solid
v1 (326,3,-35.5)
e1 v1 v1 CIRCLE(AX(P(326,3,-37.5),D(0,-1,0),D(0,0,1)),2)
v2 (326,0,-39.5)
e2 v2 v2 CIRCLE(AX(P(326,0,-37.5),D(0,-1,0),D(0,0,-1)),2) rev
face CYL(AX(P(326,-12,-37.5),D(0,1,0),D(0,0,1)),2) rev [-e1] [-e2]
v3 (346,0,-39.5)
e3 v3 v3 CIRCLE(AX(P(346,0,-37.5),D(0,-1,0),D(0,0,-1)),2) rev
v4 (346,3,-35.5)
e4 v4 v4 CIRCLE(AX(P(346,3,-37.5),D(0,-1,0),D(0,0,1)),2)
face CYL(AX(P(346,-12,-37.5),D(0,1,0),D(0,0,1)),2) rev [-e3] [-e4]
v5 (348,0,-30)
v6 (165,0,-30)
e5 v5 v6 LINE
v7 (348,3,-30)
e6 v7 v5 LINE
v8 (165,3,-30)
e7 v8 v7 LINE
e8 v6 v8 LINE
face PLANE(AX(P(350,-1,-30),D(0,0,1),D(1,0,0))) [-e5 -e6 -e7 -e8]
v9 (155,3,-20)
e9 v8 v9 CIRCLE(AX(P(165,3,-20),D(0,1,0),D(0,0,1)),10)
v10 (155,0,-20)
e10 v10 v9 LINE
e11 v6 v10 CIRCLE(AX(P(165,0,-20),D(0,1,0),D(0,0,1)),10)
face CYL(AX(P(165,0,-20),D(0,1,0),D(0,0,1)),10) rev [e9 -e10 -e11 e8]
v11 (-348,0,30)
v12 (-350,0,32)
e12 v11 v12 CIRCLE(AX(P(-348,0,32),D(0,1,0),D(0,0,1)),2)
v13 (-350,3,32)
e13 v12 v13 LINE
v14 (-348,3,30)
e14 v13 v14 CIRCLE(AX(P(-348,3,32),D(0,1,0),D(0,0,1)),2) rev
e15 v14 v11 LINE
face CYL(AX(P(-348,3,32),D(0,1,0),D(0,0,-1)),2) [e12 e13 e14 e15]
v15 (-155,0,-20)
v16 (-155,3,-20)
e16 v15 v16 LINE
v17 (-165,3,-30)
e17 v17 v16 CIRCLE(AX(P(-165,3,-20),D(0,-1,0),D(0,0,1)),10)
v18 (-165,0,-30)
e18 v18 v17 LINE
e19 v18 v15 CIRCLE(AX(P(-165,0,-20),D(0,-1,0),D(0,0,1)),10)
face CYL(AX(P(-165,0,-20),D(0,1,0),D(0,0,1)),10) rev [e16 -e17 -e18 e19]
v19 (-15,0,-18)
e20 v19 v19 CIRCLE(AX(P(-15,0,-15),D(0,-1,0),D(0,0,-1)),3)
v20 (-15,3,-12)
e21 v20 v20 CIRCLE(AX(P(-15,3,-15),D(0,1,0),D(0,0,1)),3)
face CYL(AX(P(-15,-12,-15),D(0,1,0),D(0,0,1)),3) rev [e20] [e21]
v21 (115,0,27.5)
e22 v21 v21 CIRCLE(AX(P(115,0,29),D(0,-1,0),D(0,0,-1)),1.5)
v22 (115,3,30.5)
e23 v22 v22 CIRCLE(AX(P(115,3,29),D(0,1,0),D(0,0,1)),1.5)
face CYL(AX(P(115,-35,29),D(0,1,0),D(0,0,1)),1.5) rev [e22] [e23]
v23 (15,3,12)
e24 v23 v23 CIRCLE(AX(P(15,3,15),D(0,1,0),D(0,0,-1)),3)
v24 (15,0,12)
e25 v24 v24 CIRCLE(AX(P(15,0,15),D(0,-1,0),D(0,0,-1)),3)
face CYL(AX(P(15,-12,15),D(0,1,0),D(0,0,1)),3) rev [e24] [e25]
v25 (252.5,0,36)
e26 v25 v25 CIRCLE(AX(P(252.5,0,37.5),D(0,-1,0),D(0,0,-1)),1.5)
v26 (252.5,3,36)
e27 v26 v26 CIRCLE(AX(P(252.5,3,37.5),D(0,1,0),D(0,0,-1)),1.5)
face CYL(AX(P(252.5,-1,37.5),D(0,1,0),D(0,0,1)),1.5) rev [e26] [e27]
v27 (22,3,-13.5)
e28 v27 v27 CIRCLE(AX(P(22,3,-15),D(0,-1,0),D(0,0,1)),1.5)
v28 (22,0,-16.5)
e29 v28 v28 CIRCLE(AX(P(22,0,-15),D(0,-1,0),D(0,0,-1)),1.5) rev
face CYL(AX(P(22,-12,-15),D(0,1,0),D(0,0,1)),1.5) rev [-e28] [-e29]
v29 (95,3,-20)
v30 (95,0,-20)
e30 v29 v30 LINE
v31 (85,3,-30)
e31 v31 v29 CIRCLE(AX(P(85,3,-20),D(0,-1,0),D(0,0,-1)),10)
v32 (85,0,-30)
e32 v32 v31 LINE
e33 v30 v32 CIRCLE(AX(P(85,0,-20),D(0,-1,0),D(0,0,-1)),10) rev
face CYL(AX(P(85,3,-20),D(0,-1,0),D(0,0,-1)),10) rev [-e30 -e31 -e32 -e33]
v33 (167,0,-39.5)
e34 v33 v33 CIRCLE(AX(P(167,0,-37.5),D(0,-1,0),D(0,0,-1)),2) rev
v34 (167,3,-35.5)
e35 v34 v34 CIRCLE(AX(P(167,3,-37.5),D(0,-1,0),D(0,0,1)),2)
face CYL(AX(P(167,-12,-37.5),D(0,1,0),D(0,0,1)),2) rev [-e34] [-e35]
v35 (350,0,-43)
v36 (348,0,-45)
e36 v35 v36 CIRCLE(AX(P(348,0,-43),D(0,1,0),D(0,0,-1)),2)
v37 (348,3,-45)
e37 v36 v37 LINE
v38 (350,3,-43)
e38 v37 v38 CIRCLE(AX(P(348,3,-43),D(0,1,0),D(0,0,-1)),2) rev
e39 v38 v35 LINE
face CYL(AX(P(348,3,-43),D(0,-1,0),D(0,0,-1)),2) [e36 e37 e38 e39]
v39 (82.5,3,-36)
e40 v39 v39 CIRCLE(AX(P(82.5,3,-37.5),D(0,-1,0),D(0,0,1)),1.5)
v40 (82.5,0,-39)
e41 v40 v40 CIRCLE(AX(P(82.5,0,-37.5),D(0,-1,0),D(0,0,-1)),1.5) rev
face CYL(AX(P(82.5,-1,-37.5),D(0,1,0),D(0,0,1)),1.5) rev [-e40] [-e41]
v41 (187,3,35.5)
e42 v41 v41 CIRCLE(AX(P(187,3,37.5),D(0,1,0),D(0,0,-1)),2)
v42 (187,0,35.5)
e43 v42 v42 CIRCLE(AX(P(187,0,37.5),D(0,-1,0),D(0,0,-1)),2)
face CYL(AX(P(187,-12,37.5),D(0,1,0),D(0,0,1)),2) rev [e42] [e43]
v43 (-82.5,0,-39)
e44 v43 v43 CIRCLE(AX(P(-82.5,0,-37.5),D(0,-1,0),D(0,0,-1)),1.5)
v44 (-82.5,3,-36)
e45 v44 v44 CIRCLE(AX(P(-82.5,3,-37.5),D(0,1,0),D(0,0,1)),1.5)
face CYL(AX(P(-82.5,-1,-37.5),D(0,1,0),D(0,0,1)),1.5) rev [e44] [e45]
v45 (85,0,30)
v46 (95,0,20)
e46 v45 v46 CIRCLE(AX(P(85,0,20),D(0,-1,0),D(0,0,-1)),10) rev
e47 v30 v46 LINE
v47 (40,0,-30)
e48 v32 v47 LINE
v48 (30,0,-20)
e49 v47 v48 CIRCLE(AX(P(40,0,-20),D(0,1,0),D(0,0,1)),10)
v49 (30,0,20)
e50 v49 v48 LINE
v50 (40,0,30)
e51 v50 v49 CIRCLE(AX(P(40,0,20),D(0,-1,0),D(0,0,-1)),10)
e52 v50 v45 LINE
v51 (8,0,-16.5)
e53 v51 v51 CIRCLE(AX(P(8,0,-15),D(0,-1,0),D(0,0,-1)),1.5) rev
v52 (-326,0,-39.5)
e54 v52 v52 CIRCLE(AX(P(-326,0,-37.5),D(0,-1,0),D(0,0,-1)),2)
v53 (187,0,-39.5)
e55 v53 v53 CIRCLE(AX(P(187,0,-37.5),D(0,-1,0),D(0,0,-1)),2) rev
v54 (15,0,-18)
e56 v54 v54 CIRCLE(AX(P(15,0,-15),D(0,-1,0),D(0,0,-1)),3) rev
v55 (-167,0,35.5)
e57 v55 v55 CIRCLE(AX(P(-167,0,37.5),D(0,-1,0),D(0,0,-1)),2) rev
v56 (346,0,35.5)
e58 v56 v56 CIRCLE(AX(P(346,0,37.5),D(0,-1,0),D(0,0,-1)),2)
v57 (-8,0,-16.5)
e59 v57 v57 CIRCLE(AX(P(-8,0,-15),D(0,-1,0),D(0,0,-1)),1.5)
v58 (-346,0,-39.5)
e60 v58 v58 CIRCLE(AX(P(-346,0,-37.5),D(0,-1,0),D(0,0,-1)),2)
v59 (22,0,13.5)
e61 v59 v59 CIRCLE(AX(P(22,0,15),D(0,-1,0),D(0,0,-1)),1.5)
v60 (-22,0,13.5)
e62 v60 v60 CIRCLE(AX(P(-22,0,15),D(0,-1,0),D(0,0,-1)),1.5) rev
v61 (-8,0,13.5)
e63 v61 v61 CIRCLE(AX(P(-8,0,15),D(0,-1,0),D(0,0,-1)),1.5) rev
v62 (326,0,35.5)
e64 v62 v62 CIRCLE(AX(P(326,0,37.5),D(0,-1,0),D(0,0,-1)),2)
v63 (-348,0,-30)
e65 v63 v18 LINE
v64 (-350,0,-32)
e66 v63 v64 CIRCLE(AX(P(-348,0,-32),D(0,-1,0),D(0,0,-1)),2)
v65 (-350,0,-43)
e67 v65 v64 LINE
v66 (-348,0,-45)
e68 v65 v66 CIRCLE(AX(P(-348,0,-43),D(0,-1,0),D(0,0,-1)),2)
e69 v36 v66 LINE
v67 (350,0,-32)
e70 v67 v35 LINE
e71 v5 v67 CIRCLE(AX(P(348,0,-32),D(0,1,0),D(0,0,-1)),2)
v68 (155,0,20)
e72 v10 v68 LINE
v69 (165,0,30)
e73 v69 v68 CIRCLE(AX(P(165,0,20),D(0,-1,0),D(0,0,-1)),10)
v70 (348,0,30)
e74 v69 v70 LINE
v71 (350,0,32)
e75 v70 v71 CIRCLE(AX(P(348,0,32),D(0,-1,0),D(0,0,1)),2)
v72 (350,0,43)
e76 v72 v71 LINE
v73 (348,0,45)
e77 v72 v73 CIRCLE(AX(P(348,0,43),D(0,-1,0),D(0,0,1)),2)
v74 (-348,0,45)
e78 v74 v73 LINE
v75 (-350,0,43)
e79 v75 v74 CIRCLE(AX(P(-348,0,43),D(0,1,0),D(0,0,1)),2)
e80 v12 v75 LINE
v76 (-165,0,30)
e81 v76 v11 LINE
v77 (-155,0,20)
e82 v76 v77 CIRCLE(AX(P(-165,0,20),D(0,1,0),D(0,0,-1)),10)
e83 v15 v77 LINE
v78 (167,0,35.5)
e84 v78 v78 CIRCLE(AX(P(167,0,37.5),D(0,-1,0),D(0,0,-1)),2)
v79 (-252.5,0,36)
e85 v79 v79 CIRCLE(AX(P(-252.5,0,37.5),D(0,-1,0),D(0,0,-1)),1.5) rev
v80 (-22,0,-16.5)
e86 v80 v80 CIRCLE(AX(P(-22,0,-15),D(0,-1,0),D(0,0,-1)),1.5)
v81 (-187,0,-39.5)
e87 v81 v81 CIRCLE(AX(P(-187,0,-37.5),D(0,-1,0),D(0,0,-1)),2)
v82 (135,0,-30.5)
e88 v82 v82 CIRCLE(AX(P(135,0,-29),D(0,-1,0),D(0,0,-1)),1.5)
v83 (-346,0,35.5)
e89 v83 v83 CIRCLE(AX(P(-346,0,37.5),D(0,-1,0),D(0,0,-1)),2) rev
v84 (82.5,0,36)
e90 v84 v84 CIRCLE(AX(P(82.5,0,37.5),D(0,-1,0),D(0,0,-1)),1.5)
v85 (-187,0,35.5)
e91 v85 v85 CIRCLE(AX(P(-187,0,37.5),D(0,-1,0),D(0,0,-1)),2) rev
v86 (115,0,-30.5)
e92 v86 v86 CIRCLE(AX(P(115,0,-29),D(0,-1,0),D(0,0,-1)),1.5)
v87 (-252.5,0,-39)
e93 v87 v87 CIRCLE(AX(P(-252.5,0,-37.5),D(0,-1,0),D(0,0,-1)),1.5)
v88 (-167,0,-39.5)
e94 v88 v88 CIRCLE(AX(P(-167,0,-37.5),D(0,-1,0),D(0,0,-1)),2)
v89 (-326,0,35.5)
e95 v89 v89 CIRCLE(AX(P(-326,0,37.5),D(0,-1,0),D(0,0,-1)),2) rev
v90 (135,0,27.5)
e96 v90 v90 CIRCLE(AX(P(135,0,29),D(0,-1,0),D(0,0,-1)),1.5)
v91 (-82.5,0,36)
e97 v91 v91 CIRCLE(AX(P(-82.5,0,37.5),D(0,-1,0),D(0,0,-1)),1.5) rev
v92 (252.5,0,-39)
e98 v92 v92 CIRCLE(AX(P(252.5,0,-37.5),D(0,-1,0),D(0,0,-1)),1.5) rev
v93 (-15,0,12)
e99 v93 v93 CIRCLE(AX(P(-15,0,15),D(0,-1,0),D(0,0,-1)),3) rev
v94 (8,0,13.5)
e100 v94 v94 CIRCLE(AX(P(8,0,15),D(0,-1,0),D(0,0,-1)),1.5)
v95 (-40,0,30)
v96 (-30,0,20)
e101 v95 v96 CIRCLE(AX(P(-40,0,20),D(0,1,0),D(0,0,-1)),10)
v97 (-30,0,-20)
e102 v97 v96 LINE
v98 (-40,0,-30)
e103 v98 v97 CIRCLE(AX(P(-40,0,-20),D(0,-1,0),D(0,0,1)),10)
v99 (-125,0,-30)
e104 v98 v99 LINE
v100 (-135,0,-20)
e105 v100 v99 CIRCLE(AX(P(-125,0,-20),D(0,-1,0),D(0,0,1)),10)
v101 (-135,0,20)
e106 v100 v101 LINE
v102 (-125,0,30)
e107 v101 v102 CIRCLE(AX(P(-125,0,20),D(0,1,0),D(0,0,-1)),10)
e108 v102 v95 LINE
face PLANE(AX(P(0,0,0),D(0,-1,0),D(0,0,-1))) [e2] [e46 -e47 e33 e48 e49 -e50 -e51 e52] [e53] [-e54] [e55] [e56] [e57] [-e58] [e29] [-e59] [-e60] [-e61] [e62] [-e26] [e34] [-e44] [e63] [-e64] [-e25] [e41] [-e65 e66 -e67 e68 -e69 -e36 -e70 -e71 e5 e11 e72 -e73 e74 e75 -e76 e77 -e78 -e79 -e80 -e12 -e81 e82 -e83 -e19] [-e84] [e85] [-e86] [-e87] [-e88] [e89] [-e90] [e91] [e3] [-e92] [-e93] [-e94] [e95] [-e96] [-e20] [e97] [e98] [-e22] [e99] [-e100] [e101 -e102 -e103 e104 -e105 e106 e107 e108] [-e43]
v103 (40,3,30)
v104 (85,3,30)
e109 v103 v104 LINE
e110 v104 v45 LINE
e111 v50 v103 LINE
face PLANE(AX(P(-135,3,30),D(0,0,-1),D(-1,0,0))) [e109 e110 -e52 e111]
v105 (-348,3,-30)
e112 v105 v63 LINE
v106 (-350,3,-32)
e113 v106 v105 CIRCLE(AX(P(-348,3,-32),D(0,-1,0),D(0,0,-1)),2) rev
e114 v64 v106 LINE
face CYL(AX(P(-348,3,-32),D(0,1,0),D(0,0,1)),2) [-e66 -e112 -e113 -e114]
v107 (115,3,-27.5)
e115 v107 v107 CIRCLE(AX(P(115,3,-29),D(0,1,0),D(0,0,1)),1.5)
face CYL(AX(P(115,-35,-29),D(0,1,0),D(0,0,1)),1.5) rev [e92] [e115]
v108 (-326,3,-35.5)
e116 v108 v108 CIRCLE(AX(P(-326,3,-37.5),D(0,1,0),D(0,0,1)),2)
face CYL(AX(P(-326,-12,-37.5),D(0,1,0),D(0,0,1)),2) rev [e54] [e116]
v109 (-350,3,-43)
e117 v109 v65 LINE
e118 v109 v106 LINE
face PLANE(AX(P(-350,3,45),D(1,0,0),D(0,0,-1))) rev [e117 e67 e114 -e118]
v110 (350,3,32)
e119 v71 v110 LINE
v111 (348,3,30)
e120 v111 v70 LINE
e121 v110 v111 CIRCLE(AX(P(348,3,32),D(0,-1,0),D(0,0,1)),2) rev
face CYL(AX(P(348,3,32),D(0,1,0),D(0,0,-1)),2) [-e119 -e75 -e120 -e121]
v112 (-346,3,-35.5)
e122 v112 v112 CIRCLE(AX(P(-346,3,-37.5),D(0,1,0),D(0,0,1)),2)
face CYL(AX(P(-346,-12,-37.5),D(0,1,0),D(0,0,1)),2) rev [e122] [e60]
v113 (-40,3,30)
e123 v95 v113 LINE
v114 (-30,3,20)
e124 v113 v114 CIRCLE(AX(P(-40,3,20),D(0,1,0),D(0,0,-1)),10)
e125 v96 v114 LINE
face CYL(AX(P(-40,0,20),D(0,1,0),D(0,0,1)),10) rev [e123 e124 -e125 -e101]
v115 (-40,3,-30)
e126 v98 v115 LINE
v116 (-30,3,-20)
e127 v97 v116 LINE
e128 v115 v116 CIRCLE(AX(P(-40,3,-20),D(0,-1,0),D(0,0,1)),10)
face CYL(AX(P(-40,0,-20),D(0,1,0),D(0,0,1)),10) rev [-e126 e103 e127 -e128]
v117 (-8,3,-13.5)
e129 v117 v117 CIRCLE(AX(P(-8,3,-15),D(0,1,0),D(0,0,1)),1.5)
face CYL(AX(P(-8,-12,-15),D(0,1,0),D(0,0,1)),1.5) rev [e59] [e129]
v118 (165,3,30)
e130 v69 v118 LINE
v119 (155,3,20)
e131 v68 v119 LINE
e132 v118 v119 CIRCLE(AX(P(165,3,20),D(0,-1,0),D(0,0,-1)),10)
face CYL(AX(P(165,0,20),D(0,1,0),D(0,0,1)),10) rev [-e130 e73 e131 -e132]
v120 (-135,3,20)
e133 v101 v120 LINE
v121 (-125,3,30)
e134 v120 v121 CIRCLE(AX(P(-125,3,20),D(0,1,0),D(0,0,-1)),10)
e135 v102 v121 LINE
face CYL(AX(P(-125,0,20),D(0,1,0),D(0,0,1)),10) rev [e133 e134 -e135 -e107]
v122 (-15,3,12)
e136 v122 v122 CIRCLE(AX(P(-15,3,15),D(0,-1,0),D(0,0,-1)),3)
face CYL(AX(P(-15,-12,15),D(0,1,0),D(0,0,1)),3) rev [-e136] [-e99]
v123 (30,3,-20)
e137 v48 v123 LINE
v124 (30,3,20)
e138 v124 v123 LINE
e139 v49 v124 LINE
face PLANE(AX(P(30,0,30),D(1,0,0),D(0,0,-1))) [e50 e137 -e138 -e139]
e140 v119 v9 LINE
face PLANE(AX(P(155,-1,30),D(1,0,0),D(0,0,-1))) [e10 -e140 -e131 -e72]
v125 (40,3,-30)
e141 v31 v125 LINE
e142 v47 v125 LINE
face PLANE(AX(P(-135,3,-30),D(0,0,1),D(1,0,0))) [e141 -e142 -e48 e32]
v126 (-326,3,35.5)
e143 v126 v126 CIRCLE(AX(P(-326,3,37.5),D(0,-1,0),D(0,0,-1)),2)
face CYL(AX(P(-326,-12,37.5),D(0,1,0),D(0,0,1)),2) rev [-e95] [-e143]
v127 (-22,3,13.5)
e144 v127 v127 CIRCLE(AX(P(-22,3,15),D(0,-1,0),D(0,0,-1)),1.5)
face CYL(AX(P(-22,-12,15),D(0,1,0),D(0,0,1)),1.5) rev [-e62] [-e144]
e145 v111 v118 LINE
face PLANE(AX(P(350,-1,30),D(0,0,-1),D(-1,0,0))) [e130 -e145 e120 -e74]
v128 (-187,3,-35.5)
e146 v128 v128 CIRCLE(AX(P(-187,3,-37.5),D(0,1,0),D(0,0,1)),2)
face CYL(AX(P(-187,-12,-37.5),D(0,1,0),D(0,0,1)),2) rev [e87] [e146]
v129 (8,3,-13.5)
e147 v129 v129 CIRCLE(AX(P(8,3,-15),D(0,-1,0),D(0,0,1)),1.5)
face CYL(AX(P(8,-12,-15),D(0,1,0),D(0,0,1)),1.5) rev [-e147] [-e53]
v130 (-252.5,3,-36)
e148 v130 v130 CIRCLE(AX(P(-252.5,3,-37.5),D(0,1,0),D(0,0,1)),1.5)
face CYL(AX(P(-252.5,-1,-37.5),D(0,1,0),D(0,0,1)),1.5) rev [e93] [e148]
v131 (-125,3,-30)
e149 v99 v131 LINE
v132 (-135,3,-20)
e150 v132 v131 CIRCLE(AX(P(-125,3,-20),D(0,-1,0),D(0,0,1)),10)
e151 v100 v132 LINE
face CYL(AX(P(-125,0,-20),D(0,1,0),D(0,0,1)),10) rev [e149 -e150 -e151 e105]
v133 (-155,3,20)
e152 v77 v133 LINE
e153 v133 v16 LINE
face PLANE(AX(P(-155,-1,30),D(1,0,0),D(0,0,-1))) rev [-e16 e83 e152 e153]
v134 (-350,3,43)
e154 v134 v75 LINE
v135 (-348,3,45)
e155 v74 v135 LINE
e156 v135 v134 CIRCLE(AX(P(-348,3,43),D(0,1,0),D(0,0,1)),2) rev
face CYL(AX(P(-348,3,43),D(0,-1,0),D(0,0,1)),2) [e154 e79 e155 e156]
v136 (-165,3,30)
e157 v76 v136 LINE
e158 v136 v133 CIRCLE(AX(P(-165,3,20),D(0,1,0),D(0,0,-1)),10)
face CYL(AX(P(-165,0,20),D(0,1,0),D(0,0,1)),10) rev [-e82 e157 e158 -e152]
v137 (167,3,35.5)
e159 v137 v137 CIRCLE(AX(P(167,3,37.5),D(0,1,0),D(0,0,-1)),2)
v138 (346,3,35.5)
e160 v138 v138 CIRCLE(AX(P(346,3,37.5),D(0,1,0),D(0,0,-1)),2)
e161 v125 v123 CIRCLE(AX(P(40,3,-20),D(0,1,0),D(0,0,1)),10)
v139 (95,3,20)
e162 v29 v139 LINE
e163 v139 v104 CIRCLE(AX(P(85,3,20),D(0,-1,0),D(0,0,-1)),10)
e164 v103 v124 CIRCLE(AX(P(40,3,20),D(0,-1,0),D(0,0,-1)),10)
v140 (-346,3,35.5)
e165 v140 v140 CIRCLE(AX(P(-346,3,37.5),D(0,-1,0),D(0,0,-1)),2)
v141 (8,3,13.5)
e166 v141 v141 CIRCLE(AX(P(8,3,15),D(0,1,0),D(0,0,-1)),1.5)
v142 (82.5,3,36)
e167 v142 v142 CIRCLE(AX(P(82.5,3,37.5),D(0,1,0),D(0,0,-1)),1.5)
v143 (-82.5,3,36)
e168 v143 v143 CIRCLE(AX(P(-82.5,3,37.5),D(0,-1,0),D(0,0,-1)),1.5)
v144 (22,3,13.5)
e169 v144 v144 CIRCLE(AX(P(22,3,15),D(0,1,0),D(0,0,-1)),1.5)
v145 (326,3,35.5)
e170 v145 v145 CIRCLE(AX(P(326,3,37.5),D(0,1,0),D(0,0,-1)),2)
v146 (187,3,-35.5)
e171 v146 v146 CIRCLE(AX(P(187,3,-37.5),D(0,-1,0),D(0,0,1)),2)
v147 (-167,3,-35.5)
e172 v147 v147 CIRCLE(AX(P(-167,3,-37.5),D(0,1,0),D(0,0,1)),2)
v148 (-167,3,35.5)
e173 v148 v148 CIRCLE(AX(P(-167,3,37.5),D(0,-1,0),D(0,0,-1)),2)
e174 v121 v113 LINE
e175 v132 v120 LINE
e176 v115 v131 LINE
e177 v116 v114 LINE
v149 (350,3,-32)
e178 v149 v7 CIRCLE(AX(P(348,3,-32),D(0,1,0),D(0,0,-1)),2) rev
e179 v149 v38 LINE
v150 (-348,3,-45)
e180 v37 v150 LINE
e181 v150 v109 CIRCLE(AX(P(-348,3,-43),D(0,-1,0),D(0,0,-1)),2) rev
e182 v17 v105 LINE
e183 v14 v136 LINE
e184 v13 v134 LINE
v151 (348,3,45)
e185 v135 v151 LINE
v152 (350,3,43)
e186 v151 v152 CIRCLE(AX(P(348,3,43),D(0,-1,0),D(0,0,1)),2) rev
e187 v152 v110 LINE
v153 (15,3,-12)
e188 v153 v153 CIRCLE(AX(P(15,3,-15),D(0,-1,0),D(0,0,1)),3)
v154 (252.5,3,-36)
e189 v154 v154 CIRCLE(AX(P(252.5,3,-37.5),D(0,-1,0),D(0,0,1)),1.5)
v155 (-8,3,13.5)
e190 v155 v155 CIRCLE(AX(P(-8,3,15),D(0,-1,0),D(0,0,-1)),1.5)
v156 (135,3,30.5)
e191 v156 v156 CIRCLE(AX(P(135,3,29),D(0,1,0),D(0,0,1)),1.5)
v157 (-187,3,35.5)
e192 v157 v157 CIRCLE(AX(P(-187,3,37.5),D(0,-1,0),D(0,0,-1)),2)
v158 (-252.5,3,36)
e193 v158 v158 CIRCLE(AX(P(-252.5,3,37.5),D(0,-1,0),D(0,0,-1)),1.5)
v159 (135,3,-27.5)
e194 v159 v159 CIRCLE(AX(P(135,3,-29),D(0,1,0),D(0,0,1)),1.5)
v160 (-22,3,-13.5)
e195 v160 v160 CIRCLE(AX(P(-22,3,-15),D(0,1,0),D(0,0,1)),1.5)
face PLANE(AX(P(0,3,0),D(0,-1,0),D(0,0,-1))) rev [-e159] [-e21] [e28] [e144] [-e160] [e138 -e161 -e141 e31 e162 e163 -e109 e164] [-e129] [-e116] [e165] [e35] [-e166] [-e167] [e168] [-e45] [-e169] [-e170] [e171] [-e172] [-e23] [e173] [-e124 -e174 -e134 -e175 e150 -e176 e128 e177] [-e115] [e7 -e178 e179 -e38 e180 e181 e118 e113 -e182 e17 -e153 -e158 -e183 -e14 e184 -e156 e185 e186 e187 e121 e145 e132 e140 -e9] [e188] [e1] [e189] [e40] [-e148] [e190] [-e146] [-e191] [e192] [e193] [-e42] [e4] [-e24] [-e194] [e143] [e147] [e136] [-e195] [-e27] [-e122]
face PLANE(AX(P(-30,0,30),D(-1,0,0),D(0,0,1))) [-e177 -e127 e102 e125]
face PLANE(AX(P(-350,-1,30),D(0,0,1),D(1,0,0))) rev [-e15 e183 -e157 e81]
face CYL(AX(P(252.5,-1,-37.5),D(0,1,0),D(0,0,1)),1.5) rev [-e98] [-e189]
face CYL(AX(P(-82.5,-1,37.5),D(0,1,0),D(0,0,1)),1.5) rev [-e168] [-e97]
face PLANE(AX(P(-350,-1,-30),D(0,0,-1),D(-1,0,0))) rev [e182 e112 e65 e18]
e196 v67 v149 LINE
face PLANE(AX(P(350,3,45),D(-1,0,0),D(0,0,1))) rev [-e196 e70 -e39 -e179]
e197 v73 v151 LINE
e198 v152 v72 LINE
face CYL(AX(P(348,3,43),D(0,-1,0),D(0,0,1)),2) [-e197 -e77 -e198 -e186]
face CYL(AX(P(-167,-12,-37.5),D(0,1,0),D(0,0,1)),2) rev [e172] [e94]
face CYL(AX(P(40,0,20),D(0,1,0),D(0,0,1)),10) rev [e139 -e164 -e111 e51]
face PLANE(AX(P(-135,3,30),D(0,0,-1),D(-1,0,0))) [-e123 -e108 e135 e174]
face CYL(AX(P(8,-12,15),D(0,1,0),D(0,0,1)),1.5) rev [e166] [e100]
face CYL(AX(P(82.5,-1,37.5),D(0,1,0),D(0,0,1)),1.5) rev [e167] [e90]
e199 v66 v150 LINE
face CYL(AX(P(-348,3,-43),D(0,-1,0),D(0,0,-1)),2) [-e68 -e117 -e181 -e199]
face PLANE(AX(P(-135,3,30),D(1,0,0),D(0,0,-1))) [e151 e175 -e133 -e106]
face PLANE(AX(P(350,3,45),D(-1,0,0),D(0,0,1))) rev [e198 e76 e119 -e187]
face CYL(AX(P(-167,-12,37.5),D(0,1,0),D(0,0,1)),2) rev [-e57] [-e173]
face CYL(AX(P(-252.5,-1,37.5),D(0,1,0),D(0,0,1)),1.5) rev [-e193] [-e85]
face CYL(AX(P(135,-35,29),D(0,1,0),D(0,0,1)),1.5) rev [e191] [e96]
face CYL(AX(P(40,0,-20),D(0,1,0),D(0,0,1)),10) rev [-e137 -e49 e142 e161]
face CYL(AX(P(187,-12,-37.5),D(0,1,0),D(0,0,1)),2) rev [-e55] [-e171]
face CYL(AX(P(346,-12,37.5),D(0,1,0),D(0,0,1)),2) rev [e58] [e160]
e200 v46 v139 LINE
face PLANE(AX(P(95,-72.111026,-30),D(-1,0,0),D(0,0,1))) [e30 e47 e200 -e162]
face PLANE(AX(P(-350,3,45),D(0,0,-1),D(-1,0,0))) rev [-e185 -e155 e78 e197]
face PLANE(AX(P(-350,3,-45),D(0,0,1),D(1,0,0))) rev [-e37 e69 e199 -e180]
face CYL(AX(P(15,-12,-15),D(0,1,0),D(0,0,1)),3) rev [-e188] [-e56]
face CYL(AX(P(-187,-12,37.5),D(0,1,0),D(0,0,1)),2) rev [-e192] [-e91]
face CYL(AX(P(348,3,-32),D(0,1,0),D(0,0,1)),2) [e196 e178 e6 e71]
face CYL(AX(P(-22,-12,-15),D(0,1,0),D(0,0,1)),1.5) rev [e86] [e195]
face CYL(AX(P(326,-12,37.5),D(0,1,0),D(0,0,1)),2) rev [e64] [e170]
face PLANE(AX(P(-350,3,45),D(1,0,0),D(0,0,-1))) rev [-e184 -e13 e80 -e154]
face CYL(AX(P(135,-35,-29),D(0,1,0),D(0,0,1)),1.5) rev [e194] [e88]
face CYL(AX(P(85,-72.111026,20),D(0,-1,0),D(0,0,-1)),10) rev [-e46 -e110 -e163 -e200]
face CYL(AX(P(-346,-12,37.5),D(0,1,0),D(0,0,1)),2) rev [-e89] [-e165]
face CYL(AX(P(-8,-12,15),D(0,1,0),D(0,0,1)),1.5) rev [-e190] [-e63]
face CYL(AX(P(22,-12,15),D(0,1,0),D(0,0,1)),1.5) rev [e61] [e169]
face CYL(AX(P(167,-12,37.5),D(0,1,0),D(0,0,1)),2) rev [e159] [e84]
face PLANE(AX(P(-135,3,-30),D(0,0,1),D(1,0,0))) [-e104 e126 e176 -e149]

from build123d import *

# Parameters (mm, degrees)
SKETCH_1_W                                   = 700
SKETCH_1_H                                   = 90
SKETCH_1_W_2                                 = 270
SKETCH_1_H_2                                 = 60
EXTRUDE_1_DEPTH                              = 3
SKETCH_2_W                                   = 195
SKETCH_2_H                                   = 60
CUT_EXTRUDE_1_DEPTH                          = 4
SKETCH_4_R                                   = 2
CUT_EXTRUDE_2_DEPTH                          = 15
MIRROR_2_AT_THE_SECOND_PLANE_COPY_1_SKET_R   = 2
MIRROR_2_AT_THE_SECOND_PLANE_COPY_1_DEPTH    = 15
SKETCH_5_W                                   = 60
SKETCH_5_H                                   = 60
EXTRUDE_2_DEPTH                              = 3
SKETCH_6_R                                   = 1.5
CUT_EXTRUDE_3_DEPTH                          = 4
MIRROR_3_AT_THE_SECOND_PLANE_COPY_1_SKET_R   = 1.5
MIRROR_3_AT_THE_SECOND_PLANE_COPY_1_DEPTH    = 4
SKETCH_9_W                                   = 40
SKETCH_9_H                                   = 60
EXTRUDE_4_DEPTH                              = 3
FILLET_1_R                                   = 2
MIRROR_6_DEPTH                               = 3
EXTRUDE_3_DEPTH                              = 3
MIRROR_9_AT_THE_SECOND_PLANE_COPY_1_DEPTH    = 3
SKETCH_8_R                                   = 3
SKETCH_8_R_2                                 = 1.5
CUT_EXTRUDE_4_DEPTH                          = 15
SKETCH_10_R                                  = 1.5
CUT_EXTRUDE_5_DEPTH                          = 38
MIRROR_10_AT_THE_SECOND_PLANE_COPY_1_SKE_R   = 3
MIRROR_10_AT_THE_SECOND_PLANE_COPY_1_SKE_R_2 = 1.5
MIRROR_10_AT_THE_SECOND_PLANE_COPY_1_DEPTH   = 15
FILLET_2_R                                   = 10


# Read off the part's stored shape, not the designer's step: 镜向6
with BuildPart() as part:
    # 草图1 → 凸台-拉伸1 (new body)
    with BuildSketch(Plane(origin=(0, 0, 0), x_dir=(1, 0, 0), z_dir=(0, 1, 0))):
        Rectangle(SKETCH_1_W, SKETCH_1_H)
        Rectangle(SKETCH_1_W_2, SKETCH_1_H_2, mode=Mode.SUBTRACT)
    extrude(amount=EXTRUDE_1_DEPTH)

    # 草图2 → 切除-拉伸1 (cut)
    with BuildSketch(Plane(origin=(0, 3, 0), x_dir=(1, 0, 0), z_dir=(0, 1, 0))):
        with Locations((-252.5, 0)):
            Rectangle(SKETCH_2_W, SKETCH_2_H)
    cut_extrude_1 = extrude(amount=-CUT_EXTRUDE_1_DEPTH, mode=Mode.SUBTRACT)

    # 镜向1: 切除-拉伸1 across plane
    add(cut_extrude_1.mirror(Plane(origin=(0, 0, 0), x_dir=(0, 0, 1), z_dir=(1, 0, 0))), mode=Mode.SUBTRACT)

    # 草图4 → 切除-拉伸2 (cut)
    with BuildSketch(Plane(origin=(0, 3, 0), x_dir=(1, 0, 0), z_dir=(0, 1, 0))):
        with Locations(Location((-187, 37.5, 0), (0, 0, 270))):
            Circle(SKETCH_4_R)
        with Locations(Location((-167, 37.5, 0), (0, 0, 270))):
            Circle(SKETCH_4_R)
        with Locations(Location((-346, 37.5, 0), (0, 0, 270))):
            Circle(SKETCH_4_R)
        with Locations(Location((-326, 37.5, 0), (0, 0, 270))):
            Circle(SKETCH_4_R)
    cut_extrude_2 = extrude(amount=-CUT_EXTRUDE_2_DEPTH, mode=Mode.SUBTRACT)

    # 镜向2: 切除-拉伸2 across plane
    add(cut_extrude_2.mirror(Plane(origin=(0, 0, 0), x_dir=(0, 0, 1), z_dir=(1, 0, 0))), mode=Mode.SUBTRACT)

    # 镜向2 at the second plane: 切除-拉伸2 across plane
    add(cut_extrude_2.mirror(Plane.XY), mode=Mode.SUBTRACT)

    # 镜向2 at the second plane copy 1 sket → 镜向2 at the second plane copy 1 (cut)
    with BuildSketch(Plane(origin=(0, 3, 0), x_dir=(-1, 0, 0), z_dir=(0, 1, 0))):
        with Locations(Location((-187, 37.5, 0), (0, 0, 270))):
            Circle(MIRROR_2_AT_THE_SECOND_PLANE_COPY_1_SKET_R)
        with Locations(Location((-167, 37.5, 0), (0, 0, 270))):
            Circle(MIRROR_2_AT_THE_SECOND_PLANE_COPY_1_SKET_R)
        with Locations(Location((-346, 37.5, 0), (0, 0, 270))):
            Circle(MIRROR_2_AT_THE_SECOND_PLANE_COPY_1_SKET_R)
        with Locations(Location((-326, 37.5, 0), (0, 0, 270))):
            Circle(MIRROR_2_AT_THE_SECOND_PLANE_COPY_1_SKET_R)
    extrude(amount=-MIRROR_2_AT_THE_SECOND_PLANE_COPY_1_DEPTH, mode=Mode.SUBTRACT)

    # 草图5 → 凸台-拉伸2 (add)
    with BuildSketch(Plane(origin=(0, 3, 0), x_dir=(1, 0, 0), z_dir=(0, 1, 0))):
        Rectangle(SKETCH_5_W, SKETCH_5_H)
    extrude(amount=-EXTRUDE_2_DEPTH)

    # 草图6 → 切除-拉伸3 (cut)
    with BuildSketch(Plane(origin=(0, 3, 0), x_dir=(1, 0, 0), z_dir=(0, 1, 0))):
        with Locations(Location((-252.5, 37.5, 0), (0, 0, 270))):
            Circle(SKETCH_6_R)
        with Locations(Location((-82.5, 37.5, 0), (0, 0, 270))):
            Circle(SKETCH_6_R)
    cut_extrude_3 = extrude(amount=-CUT_EXTRUDE_3_DEPTH, mode=Mode.SUBTRACT)

    # 镜向3: 切除-拉伸3 across plane
    add(cut_extrude_3.mirror(Plane.XY), mode=Mode.SUBTRACT)

    # 镜向3 at the second plane: 切除-拉伸3 across plane
    add(cut_extrude_3.mirror(Plane(origin=(0, 0, 0), x_dir=(0, 0, 1), z_dir=(1, 0, 0))), mode=Mode.SUBTRACT)

    # 镜向3 at the second plane copy 1 sket → 镜向3 at the second plane copy 1 (cut)
    with BuildSketch(Plane(origin=(0, 3, 0), x_dir=(-1, 0, 0), z_dir=(0, 1, 0))):
        with Locations(Location((-252.5, 37.5, 0), (0, 0, 270))):
            Circle(MIRROR_3_AT_THE_SECOND_PLANE_COPY_1_SKET_R)
        with Locations(Location((-82.5, 37.5, 0), (0, 0, 270))):
            Circle(MIRROR_3_AT_THE_SECOND_PLANE_COPY_1_SKET_R)
    extrude(amount=-MIRROR_3_AT_THE_SECOND_PLANE_COPY_1_DEPTH, mode=Mode.SUBTRACT)

    # 草图9 → 凸台-拉伸4 (add)
    with BuildSketch(Plane(origin=(0, 3, 0), x_dir=(1, 0, 0), z_dir=(0, 1, 0))):
        with Locations((115, 0)):
            Rectangle(SKETCH_9_W, SKETCH_9_H)
    extrude(amount=-EXTRUDE_4_DEPTH)

    # 圆角1
    fillet_1_edges = [part.edges().sort_by_distance(p)[0] for p in [
        (-350, 1.5, -30),
        (-350, 1.5, -45),
    ]]
    fillet(fillet_1_edges, radius=FILLET_1_R)

    # 镜向6 outline → 镜向6 (cut)
    with BuildSketch(Plane(origin=(0, 0, 0), x_dir=(1, 0, 0), z_dir=(0, 1, 0))):
        with BuildLine():
            Line((350, 45), (348, 45))
            ThreePointArc((348, 45), (349.414213562, 44.414213562), (350, 43))
            Line((350, 43), (350, 45))
        make_face()
        with BuildLine():
            Line((350, 30), (350, 32))
            ThreePointArc((350, 32), (349.414213562, 30.585786438), (348, 30))
            Line((348, 30), (350, 30))
        make_face()
        with BuildLine():
            Line((-350, -45), (-348, -45))
            ThreePointArc((-348, -45), (-349.414213562, -44.414213562), (-350, -43))
            Line((-350, -43), (-350, -45))
        make_face()
        with BuildLine():
            ThreePointArc((348, -30), (349.414213562, -30.585786438), (350, -32))
            Line((350, -32), (350, -30))
            Line((350, -30), (348, -30))
        make_face()
        with BuildLine():
            ThreePointArc((350, -43), (349.414213562, -44.414213562), (348, -45))
            Line((348, -45), (350, -45))
            Line((350, -45), (350, -43))
        make_face()
        with BuildLine():
            Line((-350, -30), (-350, -32))
            ThreePointArc((-350, -32), (-349.414213562, -30.585786438), (-348, -30))
            Line((-348, -30), (-350, -30))
        make_face()
    extrude(amount=MIRROR_6_DEPTH, mode=Mode.SUBTRACT)

    # 草图7 → 凸台-拉伸3 (add)
    with BuildSketch(Plane(origin=(0, 3, 0), x_dir=(1, 0, 0), z_dir=(0, 1, 0))):
        with BuildLine():
            Line((-165, 30), (-155, 30))
            Line((-155, 30), (-155, 20))
            ThreePointArc((-155, 20), (-157.928932188, 27.071067812), (-165, 30))
        make_face()
        with BuildLine():
            Line((-135, 20), (-135, 30))
            Line((-135, 30), (-125, 30))
            ThreePointArc((-125, 30), (-132.071067812, 27.071067812), (-135, 20))
        make_face()
        with BuildLine():
            Line((-40, 30), (-30, 30))
            Line((-30, 30), (-30, 20))
            ThreePointArc((-30, 20), (-32.928932188, 27.071067812), (-40, 30))
        make_face()
    extrude_3 = extrude(amount=-EXTRUDE_3_DEPTH)

    # 镜向9: 凸台-拉伸3 across plane
    add(extrude_3.mirror(Plane(origin=(0, 0, 0), x_dir=(0, 0, 1), z_dir=(1, 0, 0))))

    # 镜向9 at the second plane: 凸台-拉伸3 across plane
    add(extrude_3.mirror(Plane.XY))

    # 镜向9 at the second plane copy 1 sket → 镜向9 at the second plane copy 1 (add)
    with BuildSketch(Plane(origin=(0, 3, 0), x_dir=(-1, 0, 0), z_dir=(0, 1, 0))):
        with BuildLine():
            Line((-165, 30), (-155, 30))
            Line((-155, 30), (-155, 20))
            ThreePointArc((-155, 20), (-157.928932188, 27.071067812), (-165, 30))
        make_face()
        with BuildLine():
            Line((-135, 20), (-135, 30))
            Line((-135, 30), (-125, 30))
            ThreePointArc((-125, 30), (-132.071067812, 27.071067812), (-135, 20))
        make_face()
        with BuildLine():
            Line((-40, 30), (-30, 30))
            Line((-30, 30), (-30, 20))
            ThreePointArc((-30, 20), (-32.928932188, 27.071067812), (-40, 30))
        make_face()
    extrude(amount=-MIRROR_9_AT_THE_SECOND_PLANE_COPY_1_DEPTH)

    # 草图8 → 切除-拉伸4 (cut)
    with BuildSketch(Plane(origin=(0, 3, 0), x_dir=(1, 0, 0), z_dir=(0, 1, 0))):
        with Locations(Location((-15, 15, 0), (0, 0, 270))):
            Circle(SKETCH_8_R)
        with Locations(Location((-22, 15, 0), (0, 0, 270))):
            Circle(SKETCH_8_R_2)
        with Locations(Location((-8, 15, 0), (0, 0, 270))):
            Circle(SKETCH_8_R_2)
    cut_extrude_4 = extrude(amount=-CUT_EXTRUDE_4_DEPTH, mode=Mode.SUBTRACT)

    # 草图10 → 切除-拉伸5 (cut)
    with BuildSketch(Plane(origin=(0, 3, 0), x_dir=(1, 0, 0), z_dir=(0, 1, 0))):
        with Locations(Location((115, 29, 0), (0, 0, 270))):
            Circle(SKETCH_10_R)
        with Locations(Location((135, 29, 0), (0, 0, 270))):
            Circle(SKETCH_10_R)
        with Locations(Location((135, -29, 0), (0, 0, 270))):
            Circle(SKETCH_10_R)
        with Locations(Location((115, -29, 0), (0, 0, 270))):
            Circle(SKETCH_10_R)
    extrude(amount=-CUT_EXTRUDE_5_DEPTH, mode=Mode.SUBTRACT)

    # 镜向10: 切除-拉伸4 across plane
    add(cut_extrude_4.mirror(Plane.XY), mode=Mode.SUBTRACT)

    # 镜向10 at the second plane: 切除-拉伸4 across plane
    add(cut_extrude_4.mirror(Plane(origin=(0, 0, 0), x_dir=(0, 0, 1), z_dir=(1, 0, 0))), mode=Mode.SUBTRACT)

    # 镜向10 at the second plane copy 1 ske → 镜向10 at the second plane copy 1 (cut)
    with BuildSketch(Plane(origin=(0, 3, 0), x_dir=(-1, 0, 0), z_dir=(0, 1, 0))):
        with Locations(Location((-15, 15, 0), (0, 0, 270))):
            Circle(MIRROR_10_AT_THE_SECOND_PLANE_COPY_1_SKE_R)
        with Locations(Location((-22, 15, 0), (0, 0, 270))):
            Circle(MIRROR_10_AT_THE_SECOND_PLANE_COPY_1_SKE_R_2)
        with Locations(Location((-8, 15, 0), (0, 0, 270))):
            Circle(MIRROR_10_AT_THE_SECOND_PLANE_COPY_1_SKE_R_2)
    extrude(amount=-MIRROR_10_AT_THE_SECOND_PLANE_COPY_1_DEPTH, mode=Mode.SUBTRACT)

    # 圆角2
    fillet_2_edges = [part.edges().sort_by_distance(p)[0] for p in [
        (95, 1.5, -30),
        (95, 1.5, 30),
    ]]
    fillet(fillet_2_edges, radius=FILLET_2_R)


solid = part.part
